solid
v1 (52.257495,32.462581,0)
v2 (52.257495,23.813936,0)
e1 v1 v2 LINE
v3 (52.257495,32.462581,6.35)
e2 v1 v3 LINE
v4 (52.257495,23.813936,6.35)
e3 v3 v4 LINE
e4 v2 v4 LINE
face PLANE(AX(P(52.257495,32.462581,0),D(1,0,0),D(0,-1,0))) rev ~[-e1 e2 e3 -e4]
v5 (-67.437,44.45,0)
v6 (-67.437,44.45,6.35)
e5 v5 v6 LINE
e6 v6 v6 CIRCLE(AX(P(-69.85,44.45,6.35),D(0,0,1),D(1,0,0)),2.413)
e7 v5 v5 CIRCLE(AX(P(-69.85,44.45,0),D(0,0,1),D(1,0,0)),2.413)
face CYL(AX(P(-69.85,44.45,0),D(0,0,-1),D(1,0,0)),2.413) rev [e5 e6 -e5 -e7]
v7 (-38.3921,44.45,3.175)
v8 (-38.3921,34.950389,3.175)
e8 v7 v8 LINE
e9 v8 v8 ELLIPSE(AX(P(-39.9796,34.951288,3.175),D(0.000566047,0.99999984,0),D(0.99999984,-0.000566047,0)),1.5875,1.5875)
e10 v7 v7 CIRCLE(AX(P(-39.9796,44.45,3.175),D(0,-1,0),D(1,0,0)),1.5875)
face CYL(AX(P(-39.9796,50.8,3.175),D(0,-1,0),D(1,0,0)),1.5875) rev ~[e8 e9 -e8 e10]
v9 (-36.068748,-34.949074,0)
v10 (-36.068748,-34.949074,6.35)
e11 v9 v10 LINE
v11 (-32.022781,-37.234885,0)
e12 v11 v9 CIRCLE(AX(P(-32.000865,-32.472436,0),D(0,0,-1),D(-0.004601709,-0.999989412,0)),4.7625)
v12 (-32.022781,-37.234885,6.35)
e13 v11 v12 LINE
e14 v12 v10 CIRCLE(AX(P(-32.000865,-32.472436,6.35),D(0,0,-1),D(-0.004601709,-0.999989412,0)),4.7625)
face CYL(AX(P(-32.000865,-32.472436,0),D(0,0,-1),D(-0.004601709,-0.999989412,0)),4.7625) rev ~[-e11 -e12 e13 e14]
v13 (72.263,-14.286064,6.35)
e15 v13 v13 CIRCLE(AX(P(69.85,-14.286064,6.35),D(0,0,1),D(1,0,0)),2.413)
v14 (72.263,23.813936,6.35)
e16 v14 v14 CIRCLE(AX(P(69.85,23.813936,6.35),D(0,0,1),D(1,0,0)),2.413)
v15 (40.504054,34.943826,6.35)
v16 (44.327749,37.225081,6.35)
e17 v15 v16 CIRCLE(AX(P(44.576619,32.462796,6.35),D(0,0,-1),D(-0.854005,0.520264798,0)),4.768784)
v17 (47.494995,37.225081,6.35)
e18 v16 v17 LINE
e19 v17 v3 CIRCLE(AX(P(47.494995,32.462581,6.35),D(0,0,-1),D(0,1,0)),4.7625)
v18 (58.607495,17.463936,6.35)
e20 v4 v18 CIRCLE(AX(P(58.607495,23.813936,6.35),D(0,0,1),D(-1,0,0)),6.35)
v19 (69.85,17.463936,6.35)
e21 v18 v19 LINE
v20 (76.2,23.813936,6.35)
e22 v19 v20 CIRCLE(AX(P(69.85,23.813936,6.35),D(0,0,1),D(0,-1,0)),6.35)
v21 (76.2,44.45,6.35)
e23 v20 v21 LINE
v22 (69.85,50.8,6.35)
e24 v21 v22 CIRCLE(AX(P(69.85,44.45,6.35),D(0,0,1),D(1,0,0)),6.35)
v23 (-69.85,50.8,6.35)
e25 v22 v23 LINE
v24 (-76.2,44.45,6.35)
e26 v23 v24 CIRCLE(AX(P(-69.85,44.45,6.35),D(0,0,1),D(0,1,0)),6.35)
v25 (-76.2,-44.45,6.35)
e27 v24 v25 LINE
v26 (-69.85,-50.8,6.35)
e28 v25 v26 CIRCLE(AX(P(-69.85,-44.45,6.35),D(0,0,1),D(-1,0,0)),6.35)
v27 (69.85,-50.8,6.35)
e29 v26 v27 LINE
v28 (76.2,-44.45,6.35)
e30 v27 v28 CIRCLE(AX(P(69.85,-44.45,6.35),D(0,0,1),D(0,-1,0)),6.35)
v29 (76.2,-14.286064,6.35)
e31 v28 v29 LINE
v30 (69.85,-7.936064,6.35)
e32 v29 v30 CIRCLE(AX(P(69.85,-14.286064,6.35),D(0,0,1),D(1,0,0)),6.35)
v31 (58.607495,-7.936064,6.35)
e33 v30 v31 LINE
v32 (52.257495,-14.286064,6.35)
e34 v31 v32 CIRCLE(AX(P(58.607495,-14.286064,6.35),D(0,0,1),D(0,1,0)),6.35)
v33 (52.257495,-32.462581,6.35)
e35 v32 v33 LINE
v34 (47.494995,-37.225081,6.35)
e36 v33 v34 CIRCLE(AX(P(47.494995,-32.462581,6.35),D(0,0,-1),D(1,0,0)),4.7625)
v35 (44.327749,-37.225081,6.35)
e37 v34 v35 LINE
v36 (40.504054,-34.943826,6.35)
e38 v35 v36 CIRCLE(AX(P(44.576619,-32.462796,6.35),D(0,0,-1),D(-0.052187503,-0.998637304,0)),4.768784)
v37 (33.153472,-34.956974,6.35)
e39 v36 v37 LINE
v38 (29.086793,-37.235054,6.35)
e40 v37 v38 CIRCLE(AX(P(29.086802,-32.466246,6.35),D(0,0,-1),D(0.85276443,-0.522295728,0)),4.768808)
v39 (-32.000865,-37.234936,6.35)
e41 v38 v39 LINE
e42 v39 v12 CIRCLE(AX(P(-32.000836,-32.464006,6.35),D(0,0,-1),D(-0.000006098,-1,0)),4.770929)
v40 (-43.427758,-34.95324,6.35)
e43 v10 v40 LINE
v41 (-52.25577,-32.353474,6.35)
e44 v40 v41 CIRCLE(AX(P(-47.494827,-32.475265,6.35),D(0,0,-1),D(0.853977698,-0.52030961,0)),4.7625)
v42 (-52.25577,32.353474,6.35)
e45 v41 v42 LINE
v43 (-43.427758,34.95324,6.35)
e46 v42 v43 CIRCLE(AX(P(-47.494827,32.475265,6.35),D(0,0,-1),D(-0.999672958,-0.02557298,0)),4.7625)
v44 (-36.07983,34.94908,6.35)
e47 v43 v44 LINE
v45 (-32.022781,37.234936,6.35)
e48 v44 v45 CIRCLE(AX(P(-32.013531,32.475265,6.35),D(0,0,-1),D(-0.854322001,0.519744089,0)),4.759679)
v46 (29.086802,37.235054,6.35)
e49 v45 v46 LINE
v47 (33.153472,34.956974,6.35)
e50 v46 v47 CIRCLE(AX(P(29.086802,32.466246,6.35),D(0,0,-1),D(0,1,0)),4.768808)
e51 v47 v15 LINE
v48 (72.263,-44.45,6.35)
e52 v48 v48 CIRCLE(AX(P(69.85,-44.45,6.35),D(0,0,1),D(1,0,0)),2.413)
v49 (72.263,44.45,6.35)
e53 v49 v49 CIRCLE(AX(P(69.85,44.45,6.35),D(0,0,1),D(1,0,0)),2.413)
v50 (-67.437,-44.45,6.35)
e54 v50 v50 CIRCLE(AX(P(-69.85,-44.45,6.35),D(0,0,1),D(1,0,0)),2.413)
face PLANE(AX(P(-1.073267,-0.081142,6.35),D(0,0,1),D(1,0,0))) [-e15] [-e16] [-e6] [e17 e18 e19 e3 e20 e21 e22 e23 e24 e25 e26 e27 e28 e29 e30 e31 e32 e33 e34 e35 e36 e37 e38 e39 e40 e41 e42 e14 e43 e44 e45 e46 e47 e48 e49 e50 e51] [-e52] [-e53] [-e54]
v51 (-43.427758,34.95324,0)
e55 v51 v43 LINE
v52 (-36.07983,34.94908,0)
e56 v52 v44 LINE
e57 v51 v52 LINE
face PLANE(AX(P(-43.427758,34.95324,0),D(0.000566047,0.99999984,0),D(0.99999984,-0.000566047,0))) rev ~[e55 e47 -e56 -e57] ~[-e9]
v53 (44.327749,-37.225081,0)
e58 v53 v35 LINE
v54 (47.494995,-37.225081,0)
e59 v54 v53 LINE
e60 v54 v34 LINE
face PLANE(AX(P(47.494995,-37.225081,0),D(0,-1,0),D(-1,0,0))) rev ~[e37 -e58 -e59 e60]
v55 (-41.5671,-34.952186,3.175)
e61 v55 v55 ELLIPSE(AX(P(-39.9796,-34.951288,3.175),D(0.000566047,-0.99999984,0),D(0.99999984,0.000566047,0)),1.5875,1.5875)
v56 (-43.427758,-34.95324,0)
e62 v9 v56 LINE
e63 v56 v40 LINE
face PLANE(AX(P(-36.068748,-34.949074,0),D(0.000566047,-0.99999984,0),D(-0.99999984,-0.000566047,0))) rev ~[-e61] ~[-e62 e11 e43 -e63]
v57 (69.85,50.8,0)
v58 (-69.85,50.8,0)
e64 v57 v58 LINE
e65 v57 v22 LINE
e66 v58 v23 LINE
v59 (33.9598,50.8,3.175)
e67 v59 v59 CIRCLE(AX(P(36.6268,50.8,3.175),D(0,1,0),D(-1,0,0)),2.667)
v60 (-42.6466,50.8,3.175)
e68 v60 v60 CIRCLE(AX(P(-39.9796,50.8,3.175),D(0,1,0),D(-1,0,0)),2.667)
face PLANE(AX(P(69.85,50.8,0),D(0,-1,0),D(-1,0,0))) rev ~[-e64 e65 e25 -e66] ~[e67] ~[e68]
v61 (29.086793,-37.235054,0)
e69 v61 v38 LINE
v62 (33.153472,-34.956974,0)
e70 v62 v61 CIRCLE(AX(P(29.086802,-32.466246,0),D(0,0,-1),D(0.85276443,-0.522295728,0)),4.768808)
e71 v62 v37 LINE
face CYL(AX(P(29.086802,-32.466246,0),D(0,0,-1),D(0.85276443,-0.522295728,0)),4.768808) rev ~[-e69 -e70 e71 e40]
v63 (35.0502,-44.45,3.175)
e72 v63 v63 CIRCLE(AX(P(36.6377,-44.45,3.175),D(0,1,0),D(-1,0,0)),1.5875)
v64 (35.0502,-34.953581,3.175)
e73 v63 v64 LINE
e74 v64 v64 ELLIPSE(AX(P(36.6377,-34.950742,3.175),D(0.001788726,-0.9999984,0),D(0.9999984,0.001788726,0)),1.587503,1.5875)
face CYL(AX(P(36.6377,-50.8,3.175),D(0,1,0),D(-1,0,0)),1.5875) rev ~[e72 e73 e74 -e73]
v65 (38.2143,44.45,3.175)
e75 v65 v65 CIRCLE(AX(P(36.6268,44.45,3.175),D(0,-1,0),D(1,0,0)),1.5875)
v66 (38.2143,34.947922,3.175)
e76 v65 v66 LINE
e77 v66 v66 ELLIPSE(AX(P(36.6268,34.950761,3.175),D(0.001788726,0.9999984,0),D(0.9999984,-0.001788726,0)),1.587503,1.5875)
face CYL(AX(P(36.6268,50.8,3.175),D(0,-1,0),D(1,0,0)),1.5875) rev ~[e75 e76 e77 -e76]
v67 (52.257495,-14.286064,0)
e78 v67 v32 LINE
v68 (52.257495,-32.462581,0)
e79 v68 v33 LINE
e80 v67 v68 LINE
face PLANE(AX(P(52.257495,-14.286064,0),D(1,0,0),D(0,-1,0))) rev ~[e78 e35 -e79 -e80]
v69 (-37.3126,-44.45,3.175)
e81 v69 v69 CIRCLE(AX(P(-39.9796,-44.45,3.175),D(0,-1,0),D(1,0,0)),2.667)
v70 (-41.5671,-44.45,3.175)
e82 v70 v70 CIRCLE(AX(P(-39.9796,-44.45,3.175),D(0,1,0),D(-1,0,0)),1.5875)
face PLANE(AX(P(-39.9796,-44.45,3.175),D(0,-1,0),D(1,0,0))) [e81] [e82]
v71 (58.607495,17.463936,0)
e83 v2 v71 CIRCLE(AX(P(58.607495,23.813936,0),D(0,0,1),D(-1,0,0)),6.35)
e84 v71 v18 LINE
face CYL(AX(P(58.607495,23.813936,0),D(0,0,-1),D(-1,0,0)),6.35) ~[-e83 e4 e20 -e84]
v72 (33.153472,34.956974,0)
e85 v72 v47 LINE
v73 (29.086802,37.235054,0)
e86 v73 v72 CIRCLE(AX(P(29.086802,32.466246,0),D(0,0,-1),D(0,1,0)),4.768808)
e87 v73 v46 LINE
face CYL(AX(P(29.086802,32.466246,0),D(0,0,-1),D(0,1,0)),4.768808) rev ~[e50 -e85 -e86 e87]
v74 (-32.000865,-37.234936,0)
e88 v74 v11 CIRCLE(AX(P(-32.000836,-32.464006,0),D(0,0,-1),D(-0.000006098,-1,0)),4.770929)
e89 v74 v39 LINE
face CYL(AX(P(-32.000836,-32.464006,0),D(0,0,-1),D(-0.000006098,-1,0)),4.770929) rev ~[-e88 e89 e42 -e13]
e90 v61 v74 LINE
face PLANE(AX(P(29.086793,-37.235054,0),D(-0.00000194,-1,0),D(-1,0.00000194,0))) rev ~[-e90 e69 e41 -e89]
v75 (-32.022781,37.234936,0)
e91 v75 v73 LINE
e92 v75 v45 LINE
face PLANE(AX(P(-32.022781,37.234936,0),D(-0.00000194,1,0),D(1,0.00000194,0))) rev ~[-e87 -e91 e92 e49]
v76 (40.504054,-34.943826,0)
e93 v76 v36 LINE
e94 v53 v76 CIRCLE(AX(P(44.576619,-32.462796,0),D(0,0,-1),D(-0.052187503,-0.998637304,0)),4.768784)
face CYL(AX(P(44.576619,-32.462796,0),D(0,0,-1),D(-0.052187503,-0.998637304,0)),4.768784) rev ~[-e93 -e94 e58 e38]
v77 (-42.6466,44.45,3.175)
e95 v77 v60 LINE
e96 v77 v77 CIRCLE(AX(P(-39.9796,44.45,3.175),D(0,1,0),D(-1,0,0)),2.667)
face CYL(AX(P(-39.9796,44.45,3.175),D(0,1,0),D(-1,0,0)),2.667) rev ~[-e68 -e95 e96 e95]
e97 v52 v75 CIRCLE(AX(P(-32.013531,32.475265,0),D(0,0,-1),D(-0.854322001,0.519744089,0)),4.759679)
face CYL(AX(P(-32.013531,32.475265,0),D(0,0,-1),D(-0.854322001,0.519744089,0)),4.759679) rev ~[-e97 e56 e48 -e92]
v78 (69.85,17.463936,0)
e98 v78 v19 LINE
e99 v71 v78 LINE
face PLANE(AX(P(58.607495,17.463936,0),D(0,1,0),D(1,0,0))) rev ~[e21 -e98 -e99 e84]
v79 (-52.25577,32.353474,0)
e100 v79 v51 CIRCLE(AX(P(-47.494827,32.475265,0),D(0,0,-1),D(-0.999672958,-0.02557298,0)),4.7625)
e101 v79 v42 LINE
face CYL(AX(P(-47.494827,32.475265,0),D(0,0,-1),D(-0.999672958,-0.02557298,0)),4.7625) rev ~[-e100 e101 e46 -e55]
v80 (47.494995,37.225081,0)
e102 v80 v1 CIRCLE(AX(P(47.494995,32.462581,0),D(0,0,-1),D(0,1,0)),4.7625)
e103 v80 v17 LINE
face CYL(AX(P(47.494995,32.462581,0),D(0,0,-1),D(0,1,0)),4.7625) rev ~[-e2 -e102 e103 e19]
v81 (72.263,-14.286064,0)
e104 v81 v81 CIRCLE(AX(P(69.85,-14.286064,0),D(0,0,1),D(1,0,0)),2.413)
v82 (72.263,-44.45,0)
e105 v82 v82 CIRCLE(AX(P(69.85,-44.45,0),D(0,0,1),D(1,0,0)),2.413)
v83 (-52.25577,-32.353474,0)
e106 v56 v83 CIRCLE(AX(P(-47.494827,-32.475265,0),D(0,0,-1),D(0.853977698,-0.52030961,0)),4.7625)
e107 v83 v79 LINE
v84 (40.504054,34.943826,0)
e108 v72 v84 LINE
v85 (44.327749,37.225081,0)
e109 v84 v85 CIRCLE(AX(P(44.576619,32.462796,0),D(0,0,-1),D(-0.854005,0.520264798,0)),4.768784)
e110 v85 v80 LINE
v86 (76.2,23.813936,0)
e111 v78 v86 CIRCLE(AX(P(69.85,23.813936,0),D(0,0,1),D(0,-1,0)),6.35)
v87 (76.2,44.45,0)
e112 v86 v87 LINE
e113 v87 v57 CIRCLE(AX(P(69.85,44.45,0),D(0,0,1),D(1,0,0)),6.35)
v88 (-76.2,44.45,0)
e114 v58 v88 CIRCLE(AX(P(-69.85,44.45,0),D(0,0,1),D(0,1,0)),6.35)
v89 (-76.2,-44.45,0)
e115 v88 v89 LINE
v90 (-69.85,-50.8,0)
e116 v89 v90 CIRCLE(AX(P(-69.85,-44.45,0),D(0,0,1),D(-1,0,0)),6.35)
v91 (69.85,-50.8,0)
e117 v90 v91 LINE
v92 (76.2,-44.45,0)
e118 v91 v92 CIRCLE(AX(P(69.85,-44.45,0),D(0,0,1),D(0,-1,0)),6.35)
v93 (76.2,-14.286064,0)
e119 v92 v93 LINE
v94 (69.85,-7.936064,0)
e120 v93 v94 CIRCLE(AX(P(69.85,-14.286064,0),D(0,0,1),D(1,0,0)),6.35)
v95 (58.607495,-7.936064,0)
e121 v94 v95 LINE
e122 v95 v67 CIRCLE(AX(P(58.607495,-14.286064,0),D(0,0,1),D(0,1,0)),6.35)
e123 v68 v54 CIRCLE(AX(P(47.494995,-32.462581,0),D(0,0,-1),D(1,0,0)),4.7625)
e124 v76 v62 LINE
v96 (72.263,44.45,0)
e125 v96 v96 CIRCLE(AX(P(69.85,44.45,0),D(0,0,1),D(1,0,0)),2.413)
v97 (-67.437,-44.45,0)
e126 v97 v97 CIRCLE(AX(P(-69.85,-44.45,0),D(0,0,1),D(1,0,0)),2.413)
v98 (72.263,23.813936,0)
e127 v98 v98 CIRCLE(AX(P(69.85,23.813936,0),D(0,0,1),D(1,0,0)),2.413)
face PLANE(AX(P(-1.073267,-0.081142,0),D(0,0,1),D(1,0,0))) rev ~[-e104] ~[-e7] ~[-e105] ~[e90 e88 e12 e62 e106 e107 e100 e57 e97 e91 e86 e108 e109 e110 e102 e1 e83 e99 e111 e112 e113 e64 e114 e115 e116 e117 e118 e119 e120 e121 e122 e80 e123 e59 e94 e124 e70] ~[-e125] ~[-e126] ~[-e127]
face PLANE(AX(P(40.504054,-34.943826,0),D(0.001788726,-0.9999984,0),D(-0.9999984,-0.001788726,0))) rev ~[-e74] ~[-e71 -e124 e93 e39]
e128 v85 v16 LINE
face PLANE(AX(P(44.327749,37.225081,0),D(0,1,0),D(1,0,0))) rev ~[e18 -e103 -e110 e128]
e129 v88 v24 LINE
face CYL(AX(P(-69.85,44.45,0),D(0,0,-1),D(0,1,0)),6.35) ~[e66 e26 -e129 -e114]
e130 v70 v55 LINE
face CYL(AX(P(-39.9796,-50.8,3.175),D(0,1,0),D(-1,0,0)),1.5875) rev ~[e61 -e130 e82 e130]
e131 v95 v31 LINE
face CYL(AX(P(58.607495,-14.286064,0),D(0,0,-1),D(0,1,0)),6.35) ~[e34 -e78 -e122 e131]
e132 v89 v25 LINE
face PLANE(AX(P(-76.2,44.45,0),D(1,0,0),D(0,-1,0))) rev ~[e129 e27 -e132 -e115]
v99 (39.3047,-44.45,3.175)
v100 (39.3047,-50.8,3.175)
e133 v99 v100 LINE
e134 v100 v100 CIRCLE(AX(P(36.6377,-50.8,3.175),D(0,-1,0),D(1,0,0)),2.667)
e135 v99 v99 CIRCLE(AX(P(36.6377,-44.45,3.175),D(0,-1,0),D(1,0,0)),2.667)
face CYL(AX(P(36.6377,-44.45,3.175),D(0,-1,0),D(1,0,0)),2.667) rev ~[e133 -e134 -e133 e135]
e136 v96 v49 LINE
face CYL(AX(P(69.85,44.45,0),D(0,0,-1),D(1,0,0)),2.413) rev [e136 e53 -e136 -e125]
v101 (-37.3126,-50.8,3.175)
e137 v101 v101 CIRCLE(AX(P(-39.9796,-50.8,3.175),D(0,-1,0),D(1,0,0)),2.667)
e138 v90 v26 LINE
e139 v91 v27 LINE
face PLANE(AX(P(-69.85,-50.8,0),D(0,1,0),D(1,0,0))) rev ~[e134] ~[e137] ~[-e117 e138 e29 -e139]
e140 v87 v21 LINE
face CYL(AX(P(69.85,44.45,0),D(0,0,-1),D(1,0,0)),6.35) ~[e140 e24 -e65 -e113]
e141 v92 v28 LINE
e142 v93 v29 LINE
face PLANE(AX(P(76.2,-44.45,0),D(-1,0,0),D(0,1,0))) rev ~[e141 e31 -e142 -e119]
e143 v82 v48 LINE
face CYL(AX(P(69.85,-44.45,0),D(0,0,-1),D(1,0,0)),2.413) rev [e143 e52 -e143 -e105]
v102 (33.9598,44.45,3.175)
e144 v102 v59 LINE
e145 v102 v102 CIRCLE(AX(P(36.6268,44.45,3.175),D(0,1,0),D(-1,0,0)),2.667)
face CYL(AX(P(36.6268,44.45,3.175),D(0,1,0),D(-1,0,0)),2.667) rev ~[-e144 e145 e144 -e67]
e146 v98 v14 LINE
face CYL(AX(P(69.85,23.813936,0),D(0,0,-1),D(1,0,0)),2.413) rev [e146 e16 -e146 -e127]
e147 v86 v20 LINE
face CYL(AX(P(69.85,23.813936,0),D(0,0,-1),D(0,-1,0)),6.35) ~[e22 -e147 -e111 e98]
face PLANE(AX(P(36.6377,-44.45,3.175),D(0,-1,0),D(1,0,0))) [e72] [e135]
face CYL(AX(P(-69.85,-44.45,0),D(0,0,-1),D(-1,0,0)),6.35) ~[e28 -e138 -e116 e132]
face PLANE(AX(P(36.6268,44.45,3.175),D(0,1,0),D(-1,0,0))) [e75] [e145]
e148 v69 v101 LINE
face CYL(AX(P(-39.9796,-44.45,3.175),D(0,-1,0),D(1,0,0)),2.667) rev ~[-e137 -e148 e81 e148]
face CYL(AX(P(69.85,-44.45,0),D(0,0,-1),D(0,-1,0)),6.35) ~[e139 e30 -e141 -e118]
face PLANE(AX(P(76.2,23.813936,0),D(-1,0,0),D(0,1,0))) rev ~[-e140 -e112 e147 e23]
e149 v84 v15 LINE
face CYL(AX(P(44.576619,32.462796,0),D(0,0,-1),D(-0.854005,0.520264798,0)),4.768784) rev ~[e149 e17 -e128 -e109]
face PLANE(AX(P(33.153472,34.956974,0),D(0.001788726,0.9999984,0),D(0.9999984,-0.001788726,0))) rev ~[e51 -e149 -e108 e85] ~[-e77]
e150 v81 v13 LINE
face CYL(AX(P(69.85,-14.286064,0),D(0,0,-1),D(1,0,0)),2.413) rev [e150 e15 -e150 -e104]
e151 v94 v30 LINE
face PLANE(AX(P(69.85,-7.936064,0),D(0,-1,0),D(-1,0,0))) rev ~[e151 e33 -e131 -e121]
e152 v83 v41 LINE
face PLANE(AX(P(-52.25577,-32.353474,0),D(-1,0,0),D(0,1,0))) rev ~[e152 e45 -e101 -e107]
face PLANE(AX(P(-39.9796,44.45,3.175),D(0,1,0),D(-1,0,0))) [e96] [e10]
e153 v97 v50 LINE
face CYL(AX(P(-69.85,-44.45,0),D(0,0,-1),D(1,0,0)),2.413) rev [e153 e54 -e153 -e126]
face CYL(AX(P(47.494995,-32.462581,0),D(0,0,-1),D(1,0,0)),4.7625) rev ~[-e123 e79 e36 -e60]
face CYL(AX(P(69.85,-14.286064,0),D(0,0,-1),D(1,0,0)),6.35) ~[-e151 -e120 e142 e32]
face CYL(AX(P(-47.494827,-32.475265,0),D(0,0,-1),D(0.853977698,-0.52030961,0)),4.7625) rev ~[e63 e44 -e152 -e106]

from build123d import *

# Parameters (mm, degrees)
F0_R           = 2.413
F1_DEPTH       = 6.35
F3_D           = 3.175
F3_DEPTH       = 15.875
F3_CBORE_D     = 5.334
F3_CBORE_DEPTH = 6.35
F3_TIP         = 0.9538662327
F5_D           = 3.175
F5_DEPTH       = 15.875
F5_CBORE_D     = 5.334
F5_CBORE_DEPTH = 6.35
F5_TIP         = 0.9538662327


# Not quite as in the source:
# - ends of sketch curves that miss each other by under 0.0002 mm in the source are joined


with BuildPart() as f1:
    # F0 (on Top) → F1 (new body)
    with BuildSketch(Plane.XY):
        with BuildLine():
            Line((69.85, 50.8), (-69.85, 50.8))
            ThreePointArc((-69.85, 50.8), (-74.3401280605, 48.9401280605), (-76.2, 44.45))
            Line((-76.2, 44.45), (-76.2, -44.45))
            ThreePointArc((-76.2, -44.45), (-74.3401280605, -48.9401280605), (-69.85, -50.8))
            Line((-69.85, -50.8), (69.85, -50.8))
            ThreePointArc((69.85, -50.8), (74.3401280605, -48.9401280605), (76.2, -44.45))
            Line((76.2, -44.45), (76.2, -14.2860641539))
            ThreePointArc((76.2, -14.2860641539), (74.3401280605, -9.7959360934), (69.85, -7.9360641539))
            Line((69.85, -7.9360641539), (58.6074946763, -7.9360641539))
            ThreePointArc((58.6074946763, -7.9360641539), (54.1173666157, -9.7959360934), (52.2574946763, -14.2860641539))
            Line((52.2574946763, -14.2860641539), (52.2574946763, -32.4625809134))
            ThreePointArc((52.2574946763, -32.4625809134), (50.8625907217, -35.8301769588), (47.4949946763, -37.2250809134))
            Line((47.4949946763, -37.2250809134), (44.3277485112, -37.2250809134))
            ThreePointArc((44.3277485112, -37.2250809134), (42.13331562, -36.5581056788), (40.5040542932, -34.9438258992))
            Line((40.5040542932, -34.9438258992), (33.1534721252, -34.9569741008))
            ThreePointArc((33.1534721252, -34.9569741008), (31.4174339307, -36.6267371458), (29.0867928871, -37.2350541396))
            Line((29.0867928871, -37.2350541396), (-32.0008653101, -37.2349356495))
            ThreePointArc((-32.0008653101, -37.2349356495), (-32.011823158, -37.2349229987), (-32.0227809478, -37.23488518))
            ThreePointArc((-32.0227809478, -37.23488518), (-34.343480333, -36.6189475252), (-36.0687477759, -34.9490741523))
            Line((-36.0687477759, -34.9490741523), (-43.4277583378, -34.9532397009))
            ThreePointArc((-43.4277583378, -34.9532397009), (-48.8402121166, -37.0437819519), (-52.2557695883, -32.3534738631))
            Line((-52.2557695883, -32.3534738631), (-52.2557695883, 32.3534738631))
            ThreePointArc((-52.2557695883, 32.3534738631), (-48.8402121166, 37.0437819519), (-43.4277583378, 34.9532397009))
            Line((-43.4277583378, 34.9532397009), (-36.0798295377, 34.9490804251))
            ThreePointArc((-36.0798295377, 34.9490804251), (-34.3499401325, 36.6220397206), (-32.0227811798, 37.2349356069))
            Line((-32.0227811798, 37.2349356069), (29.0868021404, 37.2350541396))
            ThreePointArc((29.0868021404, 37.2350541396), (31.4174339307, 36.6267371458), (33.1534721252, 34.9569741008))
            Line((33.1534721252, 34.9569741008), (40.5040542932, 34.9438258992))
            ThreePointArc((40.5040542932, 34.9438258992), (42.13331562, 36.5581056788), (44.3277485112, 37.2250809134))
            Line((44.3277485112, 37.2250809134), (47.4949946763, 37.2250809134))
            ThreePointArc((47.4949946763, 37.2250809134), (50.8625907217, 35.8301769588), (52.2574946763, 32.4625809134))
            Line((52.2574946763, 32.4625809134), (52.2574946763, 23.8139358461))
            ThreePointArc((52.2574946763, 23.8139358461), (54.1173666157, 19.3238077856), (58.6074946763, 17.4639358461))
            Line((58.6074946763, 17.4639358461), (69.85, 17.4639358461))
            ThreePointArc((69.85, 17.4639358461), (74.3401280605, 19.3238077856), (76.2, 23.8139358461))
            Line((76.2, 23.8139358461), (76.2, 44.45))
            ThreePointArc((76.2, 44.45), (74.3401280605, 48.9401280605), (69.85, 50.8))
        make_face()
        with Locations((-69.85, -44.45)):
            Circle(F0_R, mode=Mode.SUBTRACT)
        with Locations((69.85, -44.45)):
            Circle(F0_R, mode=Mode.SUBTRACT)
        with Locations((69.85, -14.2860641539)):
            Circle(F0_R, mode=Mode.SUBTRACT)
        with Locations((-69.85, 44.45)):
            Circle(F0_R, mode=Mode.SUBTRACT)
        with Locations((69.85, 23.8139358461)):
            Circle(F0_R, mode=Mode.SUBTRACT)
        with Locations((69.85, 44.45)):
            Circle(F0_R, mode=Mode.SUBTRACT)
    extrude(amount=F1_DEPTH)

    # F3
    with Locations(Plane.XZ.offset(50.8)):
        with Locations((-39.9796, 3.175), (36.6377, 3.175)):
            CounterBoreHole(F3_D / 2, F3_CBORE_D / 2, F3_CBORE_DEPTH, depth=F3_DEPTH)
            with Locations((0, 0, -(F3_DEPTH + F3_TIP / 2))):  # 118° drill point
                Cone(0, F3_D / 2, F3_TIP, mode=Mode.SUBTRACT)

    # F5
    with Locations(Plane(origin=(0, 50.8, 0), x_dir=(-1, 0, 0), z_dir=(0, 1, 0))):
        with Locations((-36.6268, 3.175), (39.9796, 3.175)):
            CounterBoreHole(F5_D / 2, F5_CBORE_D / 2, F5_CBORE_DEPTH, depth=F5_DEPTH)
            with Locations((0, 0, -(F5_DEPTH + F5_TIP / 2))):  # 118° drill point
                Cone(0, F5_D / 2, F5_TIP, mode=Mode.SUBTRACT)


solid = f1.part
